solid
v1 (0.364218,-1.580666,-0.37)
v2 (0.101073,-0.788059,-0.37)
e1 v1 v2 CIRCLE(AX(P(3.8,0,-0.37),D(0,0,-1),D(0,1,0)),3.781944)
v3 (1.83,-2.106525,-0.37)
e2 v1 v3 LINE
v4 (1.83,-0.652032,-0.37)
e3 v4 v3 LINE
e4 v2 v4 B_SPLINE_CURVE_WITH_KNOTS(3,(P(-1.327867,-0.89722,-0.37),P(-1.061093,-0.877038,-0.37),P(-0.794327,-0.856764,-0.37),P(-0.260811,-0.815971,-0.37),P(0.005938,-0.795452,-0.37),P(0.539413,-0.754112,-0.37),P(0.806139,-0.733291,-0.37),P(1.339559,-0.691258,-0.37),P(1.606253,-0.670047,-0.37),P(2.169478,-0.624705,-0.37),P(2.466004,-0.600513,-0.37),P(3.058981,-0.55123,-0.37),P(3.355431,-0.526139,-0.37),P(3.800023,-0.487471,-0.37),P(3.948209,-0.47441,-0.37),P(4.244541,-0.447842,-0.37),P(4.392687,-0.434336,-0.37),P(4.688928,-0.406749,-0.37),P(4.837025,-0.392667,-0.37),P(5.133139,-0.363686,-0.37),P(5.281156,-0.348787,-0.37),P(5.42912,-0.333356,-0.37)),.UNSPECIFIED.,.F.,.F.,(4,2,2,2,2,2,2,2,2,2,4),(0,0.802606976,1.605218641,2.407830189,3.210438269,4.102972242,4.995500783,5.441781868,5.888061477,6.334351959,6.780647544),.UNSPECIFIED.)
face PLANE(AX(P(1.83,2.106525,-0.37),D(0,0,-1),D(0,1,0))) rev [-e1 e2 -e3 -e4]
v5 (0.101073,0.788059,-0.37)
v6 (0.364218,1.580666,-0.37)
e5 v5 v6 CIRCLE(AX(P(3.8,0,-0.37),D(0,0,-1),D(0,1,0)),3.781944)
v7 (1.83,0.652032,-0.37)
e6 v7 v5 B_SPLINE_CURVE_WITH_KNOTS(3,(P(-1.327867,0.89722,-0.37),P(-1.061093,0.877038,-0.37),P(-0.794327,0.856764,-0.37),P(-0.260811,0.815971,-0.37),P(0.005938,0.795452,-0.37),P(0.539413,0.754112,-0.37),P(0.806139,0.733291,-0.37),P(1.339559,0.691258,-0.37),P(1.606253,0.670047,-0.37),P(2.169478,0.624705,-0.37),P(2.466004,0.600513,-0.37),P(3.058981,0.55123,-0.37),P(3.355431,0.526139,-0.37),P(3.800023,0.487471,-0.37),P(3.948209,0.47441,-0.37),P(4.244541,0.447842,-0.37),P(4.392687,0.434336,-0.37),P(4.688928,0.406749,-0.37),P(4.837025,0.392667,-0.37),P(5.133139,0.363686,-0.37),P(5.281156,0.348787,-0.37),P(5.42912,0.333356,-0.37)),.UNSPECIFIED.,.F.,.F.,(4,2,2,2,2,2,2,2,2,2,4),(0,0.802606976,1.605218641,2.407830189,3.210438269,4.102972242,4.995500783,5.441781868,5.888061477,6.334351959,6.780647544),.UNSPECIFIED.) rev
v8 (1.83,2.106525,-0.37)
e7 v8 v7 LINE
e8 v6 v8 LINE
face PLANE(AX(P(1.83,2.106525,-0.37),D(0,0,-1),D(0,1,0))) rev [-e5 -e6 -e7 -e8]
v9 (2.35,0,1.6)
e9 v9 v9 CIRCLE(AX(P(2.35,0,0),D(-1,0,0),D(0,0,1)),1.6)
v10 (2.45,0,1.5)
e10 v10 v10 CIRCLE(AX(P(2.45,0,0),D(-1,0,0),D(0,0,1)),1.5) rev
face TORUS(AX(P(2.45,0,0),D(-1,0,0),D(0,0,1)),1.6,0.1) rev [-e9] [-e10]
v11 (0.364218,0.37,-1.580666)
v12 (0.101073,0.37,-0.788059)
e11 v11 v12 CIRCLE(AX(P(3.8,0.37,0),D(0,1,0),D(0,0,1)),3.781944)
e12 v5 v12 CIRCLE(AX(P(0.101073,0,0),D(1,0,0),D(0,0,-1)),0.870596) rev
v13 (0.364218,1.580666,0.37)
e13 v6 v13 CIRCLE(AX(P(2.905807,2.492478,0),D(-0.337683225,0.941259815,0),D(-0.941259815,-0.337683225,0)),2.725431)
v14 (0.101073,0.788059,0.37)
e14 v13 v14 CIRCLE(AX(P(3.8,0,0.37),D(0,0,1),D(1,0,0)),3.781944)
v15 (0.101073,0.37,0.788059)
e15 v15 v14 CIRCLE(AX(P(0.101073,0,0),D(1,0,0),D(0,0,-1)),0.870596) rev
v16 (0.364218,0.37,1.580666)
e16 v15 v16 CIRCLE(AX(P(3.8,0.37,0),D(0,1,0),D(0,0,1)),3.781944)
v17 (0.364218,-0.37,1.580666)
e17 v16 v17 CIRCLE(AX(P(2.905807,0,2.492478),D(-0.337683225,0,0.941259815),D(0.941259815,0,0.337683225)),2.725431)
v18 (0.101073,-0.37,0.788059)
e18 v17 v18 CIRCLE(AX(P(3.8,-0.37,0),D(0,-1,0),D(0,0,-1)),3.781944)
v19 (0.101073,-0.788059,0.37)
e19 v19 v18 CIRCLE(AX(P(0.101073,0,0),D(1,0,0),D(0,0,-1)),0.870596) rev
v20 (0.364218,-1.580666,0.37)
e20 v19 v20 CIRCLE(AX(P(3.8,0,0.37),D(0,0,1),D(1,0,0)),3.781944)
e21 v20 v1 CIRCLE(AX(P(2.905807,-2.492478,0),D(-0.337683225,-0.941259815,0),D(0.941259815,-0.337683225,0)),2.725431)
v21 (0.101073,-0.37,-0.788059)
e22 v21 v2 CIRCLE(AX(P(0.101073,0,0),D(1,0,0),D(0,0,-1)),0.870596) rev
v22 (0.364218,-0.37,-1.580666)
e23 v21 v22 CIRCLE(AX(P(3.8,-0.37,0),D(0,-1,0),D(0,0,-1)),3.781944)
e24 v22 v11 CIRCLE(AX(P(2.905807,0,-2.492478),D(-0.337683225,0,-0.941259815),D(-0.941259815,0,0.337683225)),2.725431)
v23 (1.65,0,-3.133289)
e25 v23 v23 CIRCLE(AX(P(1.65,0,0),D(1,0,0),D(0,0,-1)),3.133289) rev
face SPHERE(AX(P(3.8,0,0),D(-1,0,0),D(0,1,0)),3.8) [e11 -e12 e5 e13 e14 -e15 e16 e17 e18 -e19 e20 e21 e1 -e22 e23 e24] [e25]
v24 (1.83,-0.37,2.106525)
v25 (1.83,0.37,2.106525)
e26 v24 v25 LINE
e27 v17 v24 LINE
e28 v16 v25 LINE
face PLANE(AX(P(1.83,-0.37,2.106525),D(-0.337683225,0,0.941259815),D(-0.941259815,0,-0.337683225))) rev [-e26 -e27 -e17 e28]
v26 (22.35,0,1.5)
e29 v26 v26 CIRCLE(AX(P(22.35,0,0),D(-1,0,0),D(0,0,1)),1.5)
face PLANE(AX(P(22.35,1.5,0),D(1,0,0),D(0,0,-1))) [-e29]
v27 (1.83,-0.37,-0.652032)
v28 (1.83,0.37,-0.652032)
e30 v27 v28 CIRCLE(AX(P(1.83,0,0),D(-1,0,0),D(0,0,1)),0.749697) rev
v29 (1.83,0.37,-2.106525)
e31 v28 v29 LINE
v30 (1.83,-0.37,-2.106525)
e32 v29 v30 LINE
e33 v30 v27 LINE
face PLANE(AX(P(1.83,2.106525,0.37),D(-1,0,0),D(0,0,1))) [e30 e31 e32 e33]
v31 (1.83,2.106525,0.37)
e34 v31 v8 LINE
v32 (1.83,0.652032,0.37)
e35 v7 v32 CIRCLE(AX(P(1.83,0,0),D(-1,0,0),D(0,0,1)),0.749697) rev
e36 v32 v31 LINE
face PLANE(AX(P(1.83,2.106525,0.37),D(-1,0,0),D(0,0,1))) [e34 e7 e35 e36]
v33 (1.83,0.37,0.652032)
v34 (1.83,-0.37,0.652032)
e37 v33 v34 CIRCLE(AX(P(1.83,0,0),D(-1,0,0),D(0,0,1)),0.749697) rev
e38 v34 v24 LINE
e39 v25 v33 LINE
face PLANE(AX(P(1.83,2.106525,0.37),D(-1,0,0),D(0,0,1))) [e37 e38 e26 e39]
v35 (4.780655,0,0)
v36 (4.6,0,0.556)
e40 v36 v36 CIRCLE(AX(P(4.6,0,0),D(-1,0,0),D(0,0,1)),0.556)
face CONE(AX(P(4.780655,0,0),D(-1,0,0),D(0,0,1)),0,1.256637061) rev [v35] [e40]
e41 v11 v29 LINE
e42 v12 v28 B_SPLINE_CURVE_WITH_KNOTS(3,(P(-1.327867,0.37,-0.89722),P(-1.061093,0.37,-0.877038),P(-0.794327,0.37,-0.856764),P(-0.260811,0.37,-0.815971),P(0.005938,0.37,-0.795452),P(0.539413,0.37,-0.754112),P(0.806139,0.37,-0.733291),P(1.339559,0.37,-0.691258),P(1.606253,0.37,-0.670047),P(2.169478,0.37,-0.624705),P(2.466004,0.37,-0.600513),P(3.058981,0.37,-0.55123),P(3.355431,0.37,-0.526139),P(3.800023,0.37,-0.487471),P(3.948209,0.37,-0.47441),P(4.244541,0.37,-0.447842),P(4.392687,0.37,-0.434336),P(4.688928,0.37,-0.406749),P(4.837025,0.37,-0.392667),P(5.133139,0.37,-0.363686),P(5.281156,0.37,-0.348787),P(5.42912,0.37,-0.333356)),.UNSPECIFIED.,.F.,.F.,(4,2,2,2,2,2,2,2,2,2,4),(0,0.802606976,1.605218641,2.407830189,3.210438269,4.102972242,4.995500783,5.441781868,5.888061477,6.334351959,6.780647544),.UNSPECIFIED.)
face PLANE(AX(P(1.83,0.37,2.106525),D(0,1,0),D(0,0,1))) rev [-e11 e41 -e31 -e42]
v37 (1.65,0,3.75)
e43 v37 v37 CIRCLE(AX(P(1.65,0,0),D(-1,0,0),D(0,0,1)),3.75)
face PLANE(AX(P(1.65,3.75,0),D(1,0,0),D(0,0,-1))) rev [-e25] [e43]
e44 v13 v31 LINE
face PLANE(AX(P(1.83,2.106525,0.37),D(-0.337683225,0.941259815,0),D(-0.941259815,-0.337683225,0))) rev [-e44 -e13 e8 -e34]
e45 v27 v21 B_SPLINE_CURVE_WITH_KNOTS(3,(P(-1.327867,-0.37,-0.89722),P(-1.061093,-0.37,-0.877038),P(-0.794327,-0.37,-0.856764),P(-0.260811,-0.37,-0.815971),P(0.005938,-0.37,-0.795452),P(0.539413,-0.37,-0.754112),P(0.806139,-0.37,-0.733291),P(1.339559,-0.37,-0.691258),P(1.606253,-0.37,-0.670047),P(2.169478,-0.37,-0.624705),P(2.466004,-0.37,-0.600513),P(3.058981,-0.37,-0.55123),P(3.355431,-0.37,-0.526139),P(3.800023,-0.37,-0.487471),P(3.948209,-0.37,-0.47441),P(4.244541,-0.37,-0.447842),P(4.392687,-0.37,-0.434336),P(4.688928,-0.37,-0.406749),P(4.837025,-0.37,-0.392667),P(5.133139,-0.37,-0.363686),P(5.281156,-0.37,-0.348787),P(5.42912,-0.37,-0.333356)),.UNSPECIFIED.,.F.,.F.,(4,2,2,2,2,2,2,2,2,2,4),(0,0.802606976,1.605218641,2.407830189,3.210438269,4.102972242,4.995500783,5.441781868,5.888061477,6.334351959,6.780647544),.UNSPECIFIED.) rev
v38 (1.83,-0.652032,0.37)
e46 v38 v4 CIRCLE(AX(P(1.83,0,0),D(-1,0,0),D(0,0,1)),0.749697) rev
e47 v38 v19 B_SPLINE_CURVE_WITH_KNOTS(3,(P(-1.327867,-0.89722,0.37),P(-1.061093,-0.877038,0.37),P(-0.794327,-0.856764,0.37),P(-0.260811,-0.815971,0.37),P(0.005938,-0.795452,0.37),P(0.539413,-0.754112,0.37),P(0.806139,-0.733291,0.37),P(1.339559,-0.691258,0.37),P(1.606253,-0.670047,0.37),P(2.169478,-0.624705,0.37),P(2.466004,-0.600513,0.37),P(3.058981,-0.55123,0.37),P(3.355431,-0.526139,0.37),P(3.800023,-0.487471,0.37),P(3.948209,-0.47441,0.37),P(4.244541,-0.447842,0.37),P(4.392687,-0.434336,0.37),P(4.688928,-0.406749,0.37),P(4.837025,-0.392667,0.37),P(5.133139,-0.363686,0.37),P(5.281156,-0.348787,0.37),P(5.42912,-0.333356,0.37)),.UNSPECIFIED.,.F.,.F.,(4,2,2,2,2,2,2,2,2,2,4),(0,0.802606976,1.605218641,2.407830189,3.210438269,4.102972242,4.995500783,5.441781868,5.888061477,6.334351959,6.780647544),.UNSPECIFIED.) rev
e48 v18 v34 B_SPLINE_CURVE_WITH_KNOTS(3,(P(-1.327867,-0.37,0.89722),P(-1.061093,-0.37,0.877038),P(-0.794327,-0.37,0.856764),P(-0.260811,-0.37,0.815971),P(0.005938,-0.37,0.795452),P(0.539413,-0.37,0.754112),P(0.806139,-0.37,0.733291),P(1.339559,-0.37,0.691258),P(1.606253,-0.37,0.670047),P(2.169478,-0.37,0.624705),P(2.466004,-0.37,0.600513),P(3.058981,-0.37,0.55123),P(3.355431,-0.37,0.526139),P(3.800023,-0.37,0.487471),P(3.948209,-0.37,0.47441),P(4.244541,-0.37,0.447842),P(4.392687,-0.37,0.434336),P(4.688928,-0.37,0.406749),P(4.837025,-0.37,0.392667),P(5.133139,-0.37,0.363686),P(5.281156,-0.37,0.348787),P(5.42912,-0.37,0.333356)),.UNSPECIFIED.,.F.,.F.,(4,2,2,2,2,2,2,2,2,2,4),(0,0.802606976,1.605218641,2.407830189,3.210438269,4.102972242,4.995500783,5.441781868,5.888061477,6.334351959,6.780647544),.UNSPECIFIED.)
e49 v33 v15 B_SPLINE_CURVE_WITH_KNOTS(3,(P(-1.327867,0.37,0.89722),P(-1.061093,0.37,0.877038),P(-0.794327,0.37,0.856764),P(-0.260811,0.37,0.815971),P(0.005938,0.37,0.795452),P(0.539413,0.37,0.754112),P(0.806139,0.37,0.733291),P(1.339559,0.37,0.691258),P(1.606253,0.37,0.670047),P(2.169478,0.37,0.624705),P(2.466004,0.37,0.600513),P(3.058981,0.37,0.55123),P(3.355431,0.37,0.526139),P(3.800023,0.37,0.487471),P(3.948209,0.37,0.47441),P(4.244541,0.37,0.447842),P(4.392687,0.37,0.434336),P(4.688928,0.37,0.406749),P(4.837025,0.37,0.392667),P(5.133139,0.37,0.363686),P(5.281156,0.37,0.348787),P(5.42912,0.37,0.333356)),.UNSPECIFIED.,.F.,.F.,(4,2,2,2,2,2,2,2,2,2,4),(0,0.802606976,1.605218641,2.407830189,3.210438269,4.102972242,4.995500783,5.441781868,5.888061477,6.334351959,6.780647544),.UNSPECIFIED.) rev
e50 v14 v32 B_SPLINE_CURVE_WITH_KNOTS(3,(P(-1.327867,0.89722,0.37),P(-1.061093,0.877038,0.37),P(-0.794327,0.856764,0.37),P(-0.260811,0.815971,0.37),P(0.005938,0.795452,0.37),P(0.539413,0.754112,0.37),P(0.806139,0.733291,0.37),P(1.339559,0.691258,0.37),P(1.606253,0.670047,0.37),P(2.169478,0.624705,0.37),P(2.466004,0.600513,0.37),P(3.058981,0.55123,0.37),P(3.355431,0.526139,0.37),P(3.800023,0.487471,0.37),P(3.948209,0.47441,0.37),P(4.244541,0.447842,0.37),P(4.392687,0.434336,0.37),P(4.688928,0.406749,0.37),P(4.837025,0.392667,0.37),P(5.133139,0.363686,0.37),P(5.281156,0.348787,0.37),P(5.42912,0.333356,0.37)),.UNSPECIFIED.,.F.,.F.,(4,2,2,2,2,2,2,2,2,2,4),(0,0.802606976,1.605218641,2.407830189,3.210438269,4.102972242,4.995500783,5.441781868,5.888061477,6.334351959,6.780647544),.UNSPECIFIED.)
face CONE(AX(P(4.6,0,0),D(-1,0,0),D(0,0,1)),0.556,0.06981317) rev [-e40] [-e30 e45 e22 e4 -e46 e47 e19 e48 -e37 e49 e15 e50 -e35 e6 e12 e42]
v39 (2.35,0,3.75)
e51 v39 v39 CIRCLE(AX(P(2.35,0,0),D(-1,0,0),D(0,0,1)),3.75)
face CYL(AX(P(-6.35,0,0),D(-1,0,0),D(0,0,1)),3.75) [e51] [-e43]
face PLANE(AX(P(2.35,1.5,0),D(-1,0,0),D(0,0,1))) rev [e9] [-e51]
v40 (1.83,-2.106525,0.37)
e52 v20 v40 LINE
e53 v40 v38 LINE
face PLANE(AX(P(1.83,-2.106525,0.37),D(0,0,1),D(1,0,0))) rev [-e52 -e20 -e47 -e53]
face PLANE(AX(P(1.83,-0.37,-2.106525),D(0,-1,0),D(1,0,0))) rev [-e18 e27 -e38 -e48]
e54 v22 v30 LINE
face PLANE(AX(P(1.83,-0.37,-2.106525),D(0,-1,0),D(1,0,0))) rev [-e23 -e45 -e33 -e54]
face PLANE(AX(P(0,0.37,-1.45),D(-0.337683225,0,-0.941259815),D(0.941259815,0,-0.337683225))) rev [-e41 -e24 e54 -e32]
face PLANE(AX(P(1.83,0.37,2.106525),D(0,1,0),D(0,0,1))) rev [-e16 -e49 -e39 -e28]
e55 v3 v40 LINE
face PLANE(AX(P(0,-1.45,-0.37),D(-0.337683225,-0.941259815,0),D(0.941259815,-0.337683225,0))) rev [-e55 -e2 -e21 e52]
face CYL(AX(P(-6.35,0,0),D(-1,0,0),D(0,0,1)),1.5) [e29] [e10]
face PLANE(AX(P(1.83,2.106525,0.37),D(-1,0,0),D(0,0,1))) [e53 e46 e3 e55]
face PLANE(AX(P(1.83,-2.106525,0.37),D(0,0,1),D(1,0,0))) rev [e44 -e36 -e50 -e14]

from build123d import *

# Parameters (mm, degrees)
RECPAT_COUNT = 2
RECPAT_ANGLE = 90


with BuildPart() as part:
    # Fillet1: read off the stored shape, not the designer's step
    # Fillet1 outline → Fillet1 (revolve)
    with BuildSketch(Plane.YX):
        with BuildLine():
            Line((1.5, 2.45), (1.5, 22.35))
            Line((1.5, 22.35), (0, 22.35))
            Line((0, 22.35), (0, 1.65))
            Line((0, 1.65), (3.75, 1.65))
            Line((3.75, 1.65), (3.75, 2.35))
            Line((3.75, 2.35), (1.6, 2.35))
            ThreePointArc((1.6, 2.35), (1.529289322, 2.379289322), (1.5, 2.45))
        make_face()
    revolve(axis=Axis((0, 0, 0), (1, 0, 0)))

    # PanSke → Pan (revolve)
    with BuildSketch(Plane.XY, mode=Mode.PRIVATE) as pan_sk:
        with BuildLine():
            Line((1.65, 3.133289007), (1.65, 0))
            Line((1.65, 0), (0, 0))
            ThreePointArc((0, 0), (0.437709114, 1.770593121), (1.65, 3.133289007))
        make_face()
    revolve(pan_sk.sketch.rotate(Axis((0, 0, 0), (1, 0, 0)), 90), axis=Axis((0, 0, 0), (1, 0, 0)))

    # Sketch3 → Recess section 0
    with BuildSketch(Plane(origin=(0, 0, 0), x_dir=(0, 0, -1), z_dir=(1, 0, 0))):
        with BuildLine():
            Line((-0.37, 1.45), (0.37, 1.45))
            Line((0.37, 1.45), (0.37, -1.45))
            Line((0.37, -1.45), (-0.37, -1.45))
            Line((-0.37, -1.45), (-0.37, 1.45))
        make_face()
    # Sketch4 → Recess section 1
    with BuildSketch(Plane(origin=(1.83, 0, 0), x_dir=(0, 0, -1), z_dir=(1, 0, 0))):
        with BuildLine():
            Line((-0.37, 2.106524682), (0.37, 2.106524682))
            Line((0.37, 2.106524682), (0.37, -2.106524682))
            Line((0.37, -2.106524682), (-0.37, -2.106524682))
            Line((-0.37, -2.106524682), (-0.37, 2.106524682))
        make_face()
    recess = loft(mode=Mode.SUBTRACT)

    # RecPat: Recess ×2 about axis
    recpat_axis = Axis((0, 0, 0), (1, 0, 0))
    for i in range(1, RECPAT_COUNT):
        add(recess.rotate(recpat_axis, i * RECPAT_ANGLE / (RECPAT_COUNT - 1)), mode=Mode.SUBTRACT)

    # RecCorSke → RecessCore (revolve, cut)
    with BuildSketch(Plane.XY, mode=Mode.PRIVATE) as recesscore_sk:
        Polygon((0, 0), (0, 0.877663335), (4.6, 0.556), (4.780655351, 0), align=None)
    revolve(recesscore_sk.sketch.rotate(Axis((-3.175, 0, 0), (1, 0, 0)), 90), axis=Axis((-3.175, 0, 0), (1, 0, 0)), mode=Mode.SUBTRACT)


solid = part.part
